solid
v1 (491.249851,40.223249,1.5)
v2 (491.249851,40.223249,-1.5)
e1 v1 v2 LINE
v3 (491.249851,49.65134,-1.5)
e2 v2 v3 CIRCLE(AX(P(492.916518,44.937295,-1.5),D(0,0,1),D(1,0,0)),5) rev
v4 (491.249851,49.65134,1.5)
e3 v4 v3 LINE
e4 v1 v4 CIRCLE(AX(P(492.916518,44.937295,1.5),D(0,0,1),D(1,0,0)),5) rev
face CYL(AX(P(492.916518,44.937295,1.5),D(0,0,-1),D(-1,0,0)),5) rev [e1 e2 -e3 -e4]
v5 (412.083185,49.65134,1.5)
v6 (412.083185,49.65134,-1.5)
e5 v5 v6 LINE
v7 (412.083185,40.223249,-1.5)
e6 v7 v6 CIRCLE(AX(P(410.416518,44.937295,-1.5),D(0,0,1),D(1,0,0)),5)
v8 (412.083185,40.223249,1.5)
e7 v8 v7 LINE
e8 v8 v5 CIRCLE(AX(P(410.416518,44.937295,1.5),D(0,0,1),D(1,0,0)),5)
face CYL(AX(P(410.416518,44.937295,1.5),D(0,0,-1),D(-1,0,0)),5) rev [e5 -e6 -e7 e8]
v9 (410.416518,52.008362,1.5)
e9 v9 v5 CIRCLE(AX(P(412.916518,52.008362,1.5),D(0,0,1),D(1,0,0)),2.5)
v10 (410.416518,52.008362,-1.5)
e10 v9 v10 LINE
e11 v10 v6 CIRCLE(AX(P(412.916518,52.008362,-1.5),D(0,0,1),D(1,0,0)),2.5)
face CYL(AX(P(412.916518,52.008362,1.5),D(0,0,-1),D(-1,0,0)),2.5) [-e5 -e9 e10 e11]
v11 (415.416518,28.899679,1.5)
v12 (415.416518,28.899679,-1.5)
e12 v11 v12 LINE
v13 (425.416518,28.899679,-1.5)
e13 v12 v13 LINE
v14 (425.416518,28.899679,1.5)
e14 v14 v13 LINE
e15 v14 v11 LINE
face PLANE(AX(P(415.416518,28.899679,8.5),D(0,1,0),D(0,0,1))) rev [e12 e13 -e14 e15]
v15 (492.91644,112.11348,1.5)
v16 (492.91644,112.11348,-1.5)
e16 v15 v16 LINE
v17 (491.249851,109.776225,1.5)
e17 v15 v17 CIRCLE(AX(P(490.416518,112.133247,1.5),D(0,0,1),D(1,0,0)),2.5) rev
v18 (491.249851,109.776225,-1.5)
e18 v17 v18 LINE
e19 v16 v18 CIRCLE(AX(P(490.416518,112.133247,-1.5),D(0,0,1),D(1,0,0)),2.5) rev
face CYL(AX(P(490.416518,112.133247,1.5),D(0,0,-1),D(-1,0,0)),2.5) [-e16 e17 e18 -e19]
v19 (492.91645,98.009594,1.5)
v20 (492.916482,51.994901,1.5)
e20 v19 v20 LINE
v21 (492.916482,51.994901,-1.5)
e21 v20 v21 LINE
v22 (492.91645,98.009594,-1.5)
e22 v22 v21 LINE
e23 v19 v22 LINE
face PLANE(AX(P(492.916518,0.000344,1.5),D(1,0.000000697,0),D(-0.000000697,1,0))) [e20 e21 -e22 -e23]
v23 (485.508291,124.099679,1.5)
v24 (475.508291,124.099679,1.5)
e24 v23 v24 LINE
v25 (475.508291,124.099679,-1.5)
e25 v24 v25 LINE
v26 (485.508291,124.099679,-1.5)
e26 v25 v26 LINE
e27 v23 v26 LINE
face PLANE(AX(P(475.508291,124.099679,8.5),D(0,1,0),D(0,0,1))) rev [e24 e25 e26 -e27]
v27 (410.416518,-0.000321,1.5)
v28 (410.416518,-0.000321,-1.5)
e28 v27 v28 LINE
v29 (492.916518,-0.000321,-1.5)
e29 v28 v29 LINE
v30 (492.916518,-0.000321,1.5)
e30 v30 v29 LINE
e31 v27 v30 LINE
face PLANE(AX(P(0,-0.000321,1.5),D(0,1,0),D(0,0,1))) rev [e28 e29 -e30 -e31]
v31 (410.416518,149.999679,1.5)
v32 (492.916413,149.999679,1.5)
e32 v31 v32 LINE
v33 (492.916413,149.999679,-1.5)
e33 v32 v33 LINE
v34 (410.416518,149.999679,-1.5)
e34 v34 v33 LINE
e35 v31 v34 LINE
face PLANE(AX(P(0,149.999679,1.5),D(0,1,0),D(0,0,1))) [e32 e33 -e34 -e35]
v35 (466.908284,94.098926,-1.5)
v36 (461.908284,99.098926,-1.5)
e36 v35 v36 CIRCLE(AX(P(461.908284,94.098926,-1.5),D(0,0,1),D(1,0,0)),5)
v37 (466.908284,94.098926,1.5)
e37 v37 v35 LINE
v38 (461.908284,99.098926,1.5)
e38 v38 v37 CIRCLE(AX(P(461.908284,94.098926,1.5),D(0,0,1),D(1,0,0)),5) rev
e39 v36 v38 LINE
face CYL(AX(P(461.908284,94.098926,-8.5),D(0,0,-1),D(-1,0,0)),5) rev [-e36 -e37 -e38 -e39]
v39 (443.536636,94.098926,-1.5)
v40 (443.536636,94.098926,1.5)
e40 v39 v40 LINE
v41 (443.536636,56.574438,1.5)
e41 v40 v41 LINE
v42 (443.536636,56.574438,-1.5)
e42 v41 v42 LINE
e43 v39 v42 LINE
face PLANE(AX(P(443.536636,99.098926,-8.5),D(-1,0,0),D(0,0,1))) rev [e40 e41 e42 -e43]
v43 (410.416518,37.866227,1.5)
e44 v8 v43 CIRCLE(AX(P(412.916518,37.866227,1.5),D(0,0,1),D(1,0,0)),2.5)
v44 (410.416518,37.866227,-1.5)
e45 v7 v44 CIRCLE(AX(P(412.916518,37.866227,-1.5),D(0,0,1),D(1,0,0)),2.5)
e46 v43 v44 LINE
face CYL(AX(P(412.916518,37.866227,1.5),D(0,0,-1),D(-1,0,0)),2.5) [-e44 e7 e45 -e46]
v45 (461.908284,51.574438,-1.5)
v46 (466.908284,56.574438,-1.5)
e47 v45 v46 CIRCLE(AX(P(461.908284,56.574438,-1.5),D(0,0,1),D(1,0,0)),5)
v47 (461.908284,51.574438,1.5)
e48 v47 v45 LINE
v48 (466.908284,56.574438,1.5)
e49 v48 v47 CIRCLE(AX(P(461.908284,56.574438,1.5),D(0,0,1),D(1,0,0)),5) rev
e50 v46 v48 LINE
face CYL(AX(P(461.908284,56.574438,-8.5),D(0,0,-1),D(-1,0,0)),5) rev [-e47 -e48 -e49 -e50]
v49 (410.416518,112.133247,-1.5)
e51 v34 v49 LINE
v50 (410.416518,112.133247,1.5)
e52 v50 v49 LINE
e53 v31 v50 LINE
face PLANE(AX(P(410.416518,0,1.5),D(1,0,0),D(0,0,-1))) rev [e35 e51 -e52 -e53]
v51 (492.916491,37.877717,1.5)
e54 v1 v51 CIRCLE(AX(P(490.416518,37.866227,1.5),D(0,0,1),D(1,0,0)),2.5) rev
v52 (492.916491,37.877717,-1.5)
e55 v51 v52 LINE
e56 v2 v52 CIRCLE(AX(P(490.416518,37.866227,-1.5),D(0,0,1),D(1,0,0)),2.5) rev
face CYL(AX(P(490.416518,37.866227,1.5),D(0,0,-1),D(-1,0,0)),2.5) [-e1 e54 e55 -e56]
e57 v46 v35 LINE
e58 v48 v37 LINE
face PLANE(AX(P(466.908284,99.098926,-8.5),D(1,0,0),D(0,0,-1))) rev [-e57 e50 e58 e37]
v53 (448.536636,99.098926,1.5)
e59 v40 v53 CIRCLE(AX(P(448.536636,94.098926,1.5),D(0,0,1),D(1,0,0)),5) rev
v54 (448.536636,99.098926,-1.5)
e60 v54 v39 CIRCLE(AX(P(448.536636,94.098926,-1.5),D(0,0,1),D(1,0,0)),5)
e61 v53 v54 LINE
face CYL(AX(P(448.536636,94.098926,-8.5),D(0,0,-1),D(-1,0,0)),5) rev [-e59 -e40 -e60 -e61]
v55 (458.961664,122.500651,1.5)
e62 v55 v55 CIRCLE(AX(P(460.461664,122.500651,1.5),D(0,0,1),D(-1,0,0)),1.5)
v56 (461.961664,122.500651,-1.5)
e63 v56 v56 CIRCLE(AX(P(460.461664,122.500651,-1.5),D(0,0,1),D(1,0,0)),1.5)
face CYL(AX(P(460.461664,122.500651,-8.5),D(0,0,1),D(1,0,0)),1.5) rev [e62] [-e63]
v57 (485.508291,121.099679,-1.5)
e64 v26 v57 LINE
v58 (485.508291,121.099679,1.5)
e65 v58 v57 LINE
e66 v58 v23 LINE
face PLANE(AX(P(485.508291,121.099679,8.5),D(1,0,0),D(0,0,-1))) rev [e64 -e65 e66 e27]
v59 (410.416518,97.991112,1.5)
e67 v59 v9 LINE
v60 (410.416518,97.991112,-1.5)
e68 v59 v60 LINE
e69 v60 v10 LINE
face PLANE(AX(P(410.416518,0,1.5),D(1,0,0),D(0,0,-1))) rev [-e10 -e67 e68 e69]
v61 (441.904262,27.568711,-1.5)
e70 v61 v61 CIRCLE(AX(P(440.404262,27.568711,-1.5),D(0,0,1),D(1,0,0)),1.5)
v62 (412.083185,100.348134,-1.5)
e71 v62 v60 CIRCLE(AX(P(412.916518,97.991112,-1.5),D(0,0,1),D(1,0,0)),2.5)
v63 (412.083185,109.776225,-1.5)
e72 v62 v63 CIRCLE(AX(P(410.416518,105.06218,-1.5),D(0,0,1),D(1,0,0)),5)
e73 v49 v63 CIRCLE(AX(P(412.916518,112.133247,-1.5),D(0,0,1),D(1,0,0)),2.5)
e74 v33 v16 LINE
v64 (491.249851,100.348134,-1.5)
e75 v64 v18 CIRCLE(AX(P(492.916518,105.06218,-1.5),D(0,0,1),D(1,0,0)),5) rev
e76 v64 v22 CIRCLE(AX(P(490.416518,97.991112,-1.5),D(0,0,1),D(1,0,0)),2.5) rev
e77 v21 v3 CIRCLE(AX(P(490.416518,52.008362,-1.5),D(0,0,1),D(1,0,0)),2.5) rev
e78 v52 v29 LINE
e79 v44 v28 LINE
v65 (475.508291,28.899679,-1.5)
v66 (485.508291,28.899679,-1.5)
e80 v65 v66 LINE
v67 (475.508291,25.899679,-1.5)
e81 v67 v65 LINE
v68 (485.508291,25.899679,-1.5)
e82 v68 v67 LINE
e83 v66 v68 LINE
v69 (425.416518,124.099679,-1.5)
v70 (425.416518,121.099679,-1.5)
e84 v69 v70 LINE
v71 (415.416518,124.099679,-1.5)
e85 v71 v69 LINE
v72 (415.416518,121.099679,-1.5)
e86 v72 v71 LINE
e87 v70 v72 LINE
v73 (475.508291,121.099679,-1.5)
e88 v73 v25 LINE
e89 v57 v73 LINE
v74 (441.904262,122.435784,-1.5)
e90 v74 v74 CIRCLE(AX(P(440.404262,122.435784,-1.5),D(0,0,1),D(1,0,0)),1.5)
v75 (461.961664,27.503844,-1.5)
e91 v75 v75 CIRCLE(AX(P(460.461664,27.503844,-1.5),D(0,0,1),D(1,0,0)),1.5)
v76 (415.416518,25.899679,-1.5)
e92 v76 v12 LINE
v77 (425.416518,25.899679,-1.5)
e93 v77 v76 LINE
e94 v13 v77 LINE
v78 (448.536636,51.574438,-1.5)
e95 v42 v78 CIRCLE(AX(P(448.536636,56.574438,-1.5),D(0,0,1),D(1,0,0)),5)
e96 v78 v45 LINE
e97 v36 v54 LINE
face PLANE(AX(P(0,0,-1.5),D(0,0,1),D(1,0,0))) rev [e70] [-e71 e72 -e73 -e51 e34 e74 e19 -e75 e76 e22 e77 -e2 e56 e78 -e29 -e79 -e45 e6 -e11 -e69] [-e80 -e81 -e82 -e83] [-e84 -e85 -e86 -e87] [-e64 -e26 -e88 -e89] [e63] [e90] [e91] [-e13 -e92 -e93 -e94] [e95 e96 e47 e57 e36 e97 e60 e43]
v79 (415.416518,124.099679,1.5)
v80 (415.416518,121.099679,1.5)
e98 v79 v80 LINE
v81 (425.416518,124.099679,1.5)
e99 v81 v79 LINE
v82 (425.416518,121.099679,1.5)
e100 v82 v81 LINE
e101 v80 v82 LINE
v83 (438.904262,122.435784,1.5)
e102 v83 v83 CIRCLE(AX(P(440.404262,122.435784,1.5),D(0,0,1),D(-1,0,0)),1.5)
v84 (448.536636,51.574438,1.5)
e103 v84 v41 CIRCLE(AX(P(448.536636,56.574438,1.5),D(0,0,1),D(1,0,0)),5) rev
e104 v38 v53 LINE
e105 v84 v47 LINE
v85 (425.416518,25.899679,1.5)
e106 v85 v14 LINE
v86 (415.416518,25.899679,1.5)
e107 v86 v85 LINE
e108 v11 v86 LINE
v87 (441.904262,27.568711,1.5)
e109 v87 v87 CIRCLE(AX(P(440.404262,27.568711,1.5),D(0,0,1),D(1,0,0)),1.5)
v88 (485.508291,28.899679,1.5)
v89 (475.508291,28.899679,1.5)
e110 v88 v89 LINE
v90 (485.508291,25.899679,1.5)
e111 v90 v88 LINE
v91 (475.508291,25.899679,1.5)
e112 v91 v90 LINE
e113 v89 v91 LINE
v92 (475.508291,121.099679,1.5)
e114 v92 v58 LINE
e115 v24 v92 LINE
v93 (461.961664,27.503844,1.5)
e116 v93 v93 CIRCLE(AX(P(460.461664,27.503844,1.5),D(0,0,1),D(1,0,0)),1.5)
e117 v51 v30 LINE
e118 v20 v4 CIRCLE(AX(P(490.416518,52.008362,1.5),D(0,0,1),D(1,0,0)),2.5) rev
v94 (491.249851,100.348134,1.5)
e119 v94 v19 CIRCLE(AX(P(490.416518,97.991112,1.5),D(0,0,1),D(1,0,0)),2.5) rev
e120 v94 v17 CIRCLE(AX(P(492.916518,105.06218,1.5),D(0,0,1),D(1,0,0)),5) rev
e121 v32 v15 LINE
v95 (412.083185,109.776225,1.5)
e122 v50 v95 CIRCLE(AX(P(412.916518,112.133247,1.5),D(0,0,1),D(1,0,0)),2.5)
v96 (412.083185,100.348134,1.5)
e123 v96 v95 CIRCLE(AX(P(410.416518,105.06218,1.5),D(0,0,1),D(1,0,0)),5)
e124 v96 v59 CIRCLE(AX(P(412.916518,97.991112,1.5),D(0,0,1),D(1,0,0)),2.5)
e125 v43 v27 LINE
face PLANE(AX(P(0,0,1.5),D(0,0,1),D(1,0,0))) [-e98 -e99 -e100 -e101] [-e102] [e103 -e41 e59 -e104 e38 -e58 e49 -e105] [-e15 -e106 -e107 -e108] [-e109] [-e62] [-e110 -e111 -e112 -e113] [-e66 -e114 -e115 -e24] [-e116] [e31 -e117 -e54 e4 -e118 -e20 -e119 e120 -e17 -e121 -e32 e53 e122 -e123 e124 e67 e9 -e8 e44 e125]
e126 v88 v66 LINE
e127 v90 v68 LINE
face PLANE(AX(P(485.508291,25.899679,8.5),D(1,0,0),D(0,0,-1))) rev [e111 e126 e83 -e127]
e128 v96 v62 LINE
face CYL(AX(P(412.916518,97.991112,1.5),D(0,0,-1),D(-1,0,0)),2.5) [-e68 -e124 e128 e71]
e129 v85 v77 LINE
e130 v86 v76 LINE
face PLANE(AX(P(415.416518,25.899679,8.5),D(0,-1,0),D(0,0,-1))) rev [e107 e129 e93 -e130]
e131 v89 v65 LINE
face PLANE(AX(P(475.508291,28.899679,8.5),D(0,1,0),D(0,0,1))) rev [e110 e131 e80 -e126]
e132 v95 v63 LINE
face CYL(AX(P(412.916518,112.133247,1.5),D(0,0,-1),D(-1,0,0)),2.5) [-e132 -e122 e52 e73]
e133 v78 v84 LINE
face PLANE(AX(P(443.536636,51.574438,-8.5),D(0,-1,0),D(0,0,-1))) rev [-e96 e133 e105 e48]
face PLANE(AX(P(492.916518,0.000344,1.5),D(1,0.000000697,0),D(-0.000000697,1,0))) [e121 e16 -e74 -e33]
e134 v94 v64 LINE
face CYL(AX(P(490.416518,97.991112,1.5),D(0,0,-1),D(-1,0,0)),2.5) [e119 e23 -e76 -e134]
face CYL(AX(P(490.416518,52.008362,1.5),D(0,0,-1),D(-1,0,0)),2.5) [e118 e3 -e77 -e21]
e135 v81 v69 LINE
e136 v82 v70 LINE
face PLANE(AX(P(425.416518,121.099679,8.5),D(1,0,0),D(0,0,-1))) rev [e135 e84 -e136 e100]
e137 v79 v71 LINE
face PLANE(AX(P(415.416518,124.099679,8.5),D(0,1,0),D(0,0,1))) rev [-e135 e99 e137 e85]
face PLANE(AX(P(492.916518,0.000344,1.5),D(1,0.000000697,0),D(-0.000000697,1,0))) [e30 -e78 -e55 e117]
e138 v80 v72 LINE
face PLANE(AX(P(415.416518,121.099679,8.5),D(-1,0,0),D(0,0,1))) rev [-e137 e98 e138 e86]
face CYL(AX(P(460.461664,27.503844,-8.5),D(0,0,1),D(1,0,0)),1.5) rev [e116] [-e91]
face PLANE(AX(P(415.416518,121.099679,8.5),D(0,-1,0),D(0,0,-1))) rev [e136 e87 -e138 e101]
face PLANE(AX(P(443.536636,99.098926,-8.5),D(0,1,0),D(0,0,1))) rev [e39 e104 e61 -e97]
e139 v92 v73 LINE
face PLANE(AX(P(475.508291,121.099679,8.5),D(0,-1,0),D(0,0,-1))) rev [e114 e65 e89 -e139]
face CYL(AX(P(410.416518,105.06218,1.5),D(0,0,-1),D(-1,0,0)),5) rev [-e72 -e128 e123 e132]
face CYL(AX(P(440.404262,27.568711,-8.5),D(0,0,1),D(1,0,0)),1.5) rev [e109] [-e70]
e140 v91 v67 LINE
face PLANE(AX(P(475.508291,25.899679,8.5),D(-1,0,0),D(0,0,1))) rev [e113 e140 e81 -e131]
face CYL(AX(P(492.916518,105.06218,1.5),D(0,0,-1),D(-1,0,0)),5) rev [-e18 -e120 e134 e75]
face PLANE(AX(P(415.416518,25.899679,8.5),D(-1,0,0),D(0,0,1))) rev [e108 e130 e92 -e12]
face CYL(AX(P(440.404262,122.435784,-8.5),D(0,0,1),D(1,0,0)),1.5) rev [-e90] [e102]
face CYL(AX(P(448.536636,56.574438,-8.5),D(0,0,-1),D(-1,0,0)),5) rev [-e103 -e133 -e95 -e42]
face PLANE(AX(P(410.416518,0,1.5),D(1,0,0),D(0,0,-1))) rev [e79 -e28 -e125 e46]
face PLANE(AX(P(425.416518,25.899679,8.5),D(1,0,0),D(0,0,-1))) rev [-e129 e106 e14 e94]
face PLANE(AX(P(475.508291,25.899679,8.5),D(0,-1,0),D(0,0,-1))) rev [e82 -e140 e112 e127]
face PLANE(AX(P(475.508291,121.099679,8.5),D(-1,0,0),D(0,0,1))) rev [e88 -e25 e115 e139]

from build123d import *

# Parameters (mm, degrees)
SALIENTE_EXTRUIR1_START = -1.5
SALIENTE_EXTRUIR1_DEPTH = 3
CROQUIS4_W              = 23.371648172
CROQUIS4_H              = 47.52448784
CORTAR_EXTRUIR3_DEPTH   = 10
CROQUIS5_W              = 9.999999994
CROQUIS5_H              = 3
CROQUIS5_W_2            = 9.999999993
CORTAR_EXTRUIR4_DEPTH   = 10
CROQUIS6_R              = 1.5
CORTAR_EXTRUIR5_DEPTH   = 10
REDONDEO1_R             = 5


# Read off the part's stored shape, not the designer's step: Saliente-Extruir1
with BuildPart() as part:
    # Saliente-Extruir1 outline → Saliente-Extruir1 (new body)
    with BuildSketch(Plane.XY.offset(SALIENTE_EXTRUIR1_START)):
        with BuildLine():
            ThreePointArc((492.916449572, 98.009593947), (492.452410006, 99.442022929), (491.249851225, 100.348134338))
            ThreePointArc((491.249851225, 100.348134338), (487.916517891, 105.062179546), (491.249851225, 109.776224754))
            ThreePointArc((491.249851225, 109.776224754), (492.452037009, 110.681812922), (492.916439741, 112.113480025))
            Line((492.916439741, 112.113480025), (492.916413331, 149.999679341))
            Line((492.916413331, 149.999679341), (410.416517891, 149.999679341))
            Line((410.416517891, 149.999679341), (410.416517891, 112.133247358))
            ThreePointArc((410.416517891, 112.133247358), (410.875276439, 110.689871685), (412.083184558, 109.776224754))
            ThreePointArc((412.083184558, 109.776224754), (415.416517891, 105.062179546), (412.083184558, 100.348134338))
            ThreePointArc((412.083184558, 100.348134338), (410.875276439, 99.434487407), (410.416517891, 97.991111734))
            Line((410.416517891, 97.991111734), (410.416517891, 52.008362374))
            ThreePointArc((410.416517891, 52.008362374), (410.875276439, 50.564986701), (412.083184558, 49.65133977))
            ThreePointArc((412.083184558, 49.65133977), (415.416517891, 44.937294562), (412.083184558, 40.223249354))
            ThreePointArc((412.083184558, 40.223249354), (410.875276439, 39.309602423), (410.416517891, 37.86622675))
            Line((410.416517891, 37.86622675), (410.416517891, -0.000320659))
            Line((410.416517891, -0.000320659), (492.916517891, -0.000320659))
            Line((492.916517891, -0.000320659), (492.916491488, 37.877716604))
            ThreePointArc((492.916491488, 37.877716604), (492.45443711, 39.314289338), (491.249851225, 40.223249354))
            ThreePointArc((491.249851225, 40.223249354), (487.916517891, 44.937294562), (491.249851225, 49.65133977))
            ThreePointArc((491.249851225, 49.65133977), (492.453865854, 50.559496169), (492.916481647, 51.994900607))
            Line((492.916481647, 51.994900607), (492.916449572, 98.009593947))
        make_face()
    extrude(amount=SALIENTE_EXTRUIR1_DEPTH)

    # Croquis4 → Cortar-Extruir3 (cut)
    with BuildSketch(Plane.XY.offset(1.5)):
        with Locations((455.222459901, 75.336681949)):
            Rectangle(CROQUIS4_W, CROQUIS4_H)
    extrude(amount=-CORTAR_EXTRUIR3_DEPTH, mode=Mode.SUBTRACT)

    # Croquis5 → Cortar-Extruir4 (cut)
    with BuildSketch(Plane(origin=(0, 0, -1.5), x_dir=(-1, 0, 0), z_dir=(0, 0, -1))):
        with Locations((-420.416517885, 27.399679341)):
            Rectangle(CROQUIS5_W, CROQUIS5_H)
        with Locations((-480.50829052, 27.399679341)):
            Rectangle(CROQUIS5_W_2, CROQUIS5_H)
        with Locations((-480.50829052, 122.599679342)):
            Rectangle(CROQUIS5_W_2, CROQUIS5_H)
        with Locations((-420.416517885, 122.599679342)):
            Rectangle(CROQUIS5_W, CROQUIS5_H)
    extrude(amount=-CORTAR_EXTRUIR4_DEPTH, mode=Mode.SUBTRACT)

    # Croquis6 → Cortar-Extruir5 (cut)
    with BuildSketch(Plane.XY.offset(1.5)):
        with Locations((460.461664074, 27.503843939)):
            Circle(CROQUIS6_R)
        with Locations((440.404261852, 27.568711017)):
            Circle(CROQUIS6_R)
        with Locations((440.404261852, 122.435783537)):
            Circle(CROQUIS6_R)
        with Locations((460.461664074, 122.500650615)):
            Circle(CROQUIS6_R)
    extrude(amount=-CORTAR_EXTRUIR5_DEPTH, mode=Mode.SUBTRACT)

    # Redondeo1
    redondeo1_edges = [part.edges().sort_by_distance(p)[0] for p in [
        (466.908283987, 99.098925869, 0),
        (466.908283987, 51.574438029, 0),
        (443.536635815, 51.574438029, 0),
        (443.536635815, 99.098925869, 0),
    ]]
    fillet(redondeo1_edges, radius=REDONDEO1_R)


solid = part.part
